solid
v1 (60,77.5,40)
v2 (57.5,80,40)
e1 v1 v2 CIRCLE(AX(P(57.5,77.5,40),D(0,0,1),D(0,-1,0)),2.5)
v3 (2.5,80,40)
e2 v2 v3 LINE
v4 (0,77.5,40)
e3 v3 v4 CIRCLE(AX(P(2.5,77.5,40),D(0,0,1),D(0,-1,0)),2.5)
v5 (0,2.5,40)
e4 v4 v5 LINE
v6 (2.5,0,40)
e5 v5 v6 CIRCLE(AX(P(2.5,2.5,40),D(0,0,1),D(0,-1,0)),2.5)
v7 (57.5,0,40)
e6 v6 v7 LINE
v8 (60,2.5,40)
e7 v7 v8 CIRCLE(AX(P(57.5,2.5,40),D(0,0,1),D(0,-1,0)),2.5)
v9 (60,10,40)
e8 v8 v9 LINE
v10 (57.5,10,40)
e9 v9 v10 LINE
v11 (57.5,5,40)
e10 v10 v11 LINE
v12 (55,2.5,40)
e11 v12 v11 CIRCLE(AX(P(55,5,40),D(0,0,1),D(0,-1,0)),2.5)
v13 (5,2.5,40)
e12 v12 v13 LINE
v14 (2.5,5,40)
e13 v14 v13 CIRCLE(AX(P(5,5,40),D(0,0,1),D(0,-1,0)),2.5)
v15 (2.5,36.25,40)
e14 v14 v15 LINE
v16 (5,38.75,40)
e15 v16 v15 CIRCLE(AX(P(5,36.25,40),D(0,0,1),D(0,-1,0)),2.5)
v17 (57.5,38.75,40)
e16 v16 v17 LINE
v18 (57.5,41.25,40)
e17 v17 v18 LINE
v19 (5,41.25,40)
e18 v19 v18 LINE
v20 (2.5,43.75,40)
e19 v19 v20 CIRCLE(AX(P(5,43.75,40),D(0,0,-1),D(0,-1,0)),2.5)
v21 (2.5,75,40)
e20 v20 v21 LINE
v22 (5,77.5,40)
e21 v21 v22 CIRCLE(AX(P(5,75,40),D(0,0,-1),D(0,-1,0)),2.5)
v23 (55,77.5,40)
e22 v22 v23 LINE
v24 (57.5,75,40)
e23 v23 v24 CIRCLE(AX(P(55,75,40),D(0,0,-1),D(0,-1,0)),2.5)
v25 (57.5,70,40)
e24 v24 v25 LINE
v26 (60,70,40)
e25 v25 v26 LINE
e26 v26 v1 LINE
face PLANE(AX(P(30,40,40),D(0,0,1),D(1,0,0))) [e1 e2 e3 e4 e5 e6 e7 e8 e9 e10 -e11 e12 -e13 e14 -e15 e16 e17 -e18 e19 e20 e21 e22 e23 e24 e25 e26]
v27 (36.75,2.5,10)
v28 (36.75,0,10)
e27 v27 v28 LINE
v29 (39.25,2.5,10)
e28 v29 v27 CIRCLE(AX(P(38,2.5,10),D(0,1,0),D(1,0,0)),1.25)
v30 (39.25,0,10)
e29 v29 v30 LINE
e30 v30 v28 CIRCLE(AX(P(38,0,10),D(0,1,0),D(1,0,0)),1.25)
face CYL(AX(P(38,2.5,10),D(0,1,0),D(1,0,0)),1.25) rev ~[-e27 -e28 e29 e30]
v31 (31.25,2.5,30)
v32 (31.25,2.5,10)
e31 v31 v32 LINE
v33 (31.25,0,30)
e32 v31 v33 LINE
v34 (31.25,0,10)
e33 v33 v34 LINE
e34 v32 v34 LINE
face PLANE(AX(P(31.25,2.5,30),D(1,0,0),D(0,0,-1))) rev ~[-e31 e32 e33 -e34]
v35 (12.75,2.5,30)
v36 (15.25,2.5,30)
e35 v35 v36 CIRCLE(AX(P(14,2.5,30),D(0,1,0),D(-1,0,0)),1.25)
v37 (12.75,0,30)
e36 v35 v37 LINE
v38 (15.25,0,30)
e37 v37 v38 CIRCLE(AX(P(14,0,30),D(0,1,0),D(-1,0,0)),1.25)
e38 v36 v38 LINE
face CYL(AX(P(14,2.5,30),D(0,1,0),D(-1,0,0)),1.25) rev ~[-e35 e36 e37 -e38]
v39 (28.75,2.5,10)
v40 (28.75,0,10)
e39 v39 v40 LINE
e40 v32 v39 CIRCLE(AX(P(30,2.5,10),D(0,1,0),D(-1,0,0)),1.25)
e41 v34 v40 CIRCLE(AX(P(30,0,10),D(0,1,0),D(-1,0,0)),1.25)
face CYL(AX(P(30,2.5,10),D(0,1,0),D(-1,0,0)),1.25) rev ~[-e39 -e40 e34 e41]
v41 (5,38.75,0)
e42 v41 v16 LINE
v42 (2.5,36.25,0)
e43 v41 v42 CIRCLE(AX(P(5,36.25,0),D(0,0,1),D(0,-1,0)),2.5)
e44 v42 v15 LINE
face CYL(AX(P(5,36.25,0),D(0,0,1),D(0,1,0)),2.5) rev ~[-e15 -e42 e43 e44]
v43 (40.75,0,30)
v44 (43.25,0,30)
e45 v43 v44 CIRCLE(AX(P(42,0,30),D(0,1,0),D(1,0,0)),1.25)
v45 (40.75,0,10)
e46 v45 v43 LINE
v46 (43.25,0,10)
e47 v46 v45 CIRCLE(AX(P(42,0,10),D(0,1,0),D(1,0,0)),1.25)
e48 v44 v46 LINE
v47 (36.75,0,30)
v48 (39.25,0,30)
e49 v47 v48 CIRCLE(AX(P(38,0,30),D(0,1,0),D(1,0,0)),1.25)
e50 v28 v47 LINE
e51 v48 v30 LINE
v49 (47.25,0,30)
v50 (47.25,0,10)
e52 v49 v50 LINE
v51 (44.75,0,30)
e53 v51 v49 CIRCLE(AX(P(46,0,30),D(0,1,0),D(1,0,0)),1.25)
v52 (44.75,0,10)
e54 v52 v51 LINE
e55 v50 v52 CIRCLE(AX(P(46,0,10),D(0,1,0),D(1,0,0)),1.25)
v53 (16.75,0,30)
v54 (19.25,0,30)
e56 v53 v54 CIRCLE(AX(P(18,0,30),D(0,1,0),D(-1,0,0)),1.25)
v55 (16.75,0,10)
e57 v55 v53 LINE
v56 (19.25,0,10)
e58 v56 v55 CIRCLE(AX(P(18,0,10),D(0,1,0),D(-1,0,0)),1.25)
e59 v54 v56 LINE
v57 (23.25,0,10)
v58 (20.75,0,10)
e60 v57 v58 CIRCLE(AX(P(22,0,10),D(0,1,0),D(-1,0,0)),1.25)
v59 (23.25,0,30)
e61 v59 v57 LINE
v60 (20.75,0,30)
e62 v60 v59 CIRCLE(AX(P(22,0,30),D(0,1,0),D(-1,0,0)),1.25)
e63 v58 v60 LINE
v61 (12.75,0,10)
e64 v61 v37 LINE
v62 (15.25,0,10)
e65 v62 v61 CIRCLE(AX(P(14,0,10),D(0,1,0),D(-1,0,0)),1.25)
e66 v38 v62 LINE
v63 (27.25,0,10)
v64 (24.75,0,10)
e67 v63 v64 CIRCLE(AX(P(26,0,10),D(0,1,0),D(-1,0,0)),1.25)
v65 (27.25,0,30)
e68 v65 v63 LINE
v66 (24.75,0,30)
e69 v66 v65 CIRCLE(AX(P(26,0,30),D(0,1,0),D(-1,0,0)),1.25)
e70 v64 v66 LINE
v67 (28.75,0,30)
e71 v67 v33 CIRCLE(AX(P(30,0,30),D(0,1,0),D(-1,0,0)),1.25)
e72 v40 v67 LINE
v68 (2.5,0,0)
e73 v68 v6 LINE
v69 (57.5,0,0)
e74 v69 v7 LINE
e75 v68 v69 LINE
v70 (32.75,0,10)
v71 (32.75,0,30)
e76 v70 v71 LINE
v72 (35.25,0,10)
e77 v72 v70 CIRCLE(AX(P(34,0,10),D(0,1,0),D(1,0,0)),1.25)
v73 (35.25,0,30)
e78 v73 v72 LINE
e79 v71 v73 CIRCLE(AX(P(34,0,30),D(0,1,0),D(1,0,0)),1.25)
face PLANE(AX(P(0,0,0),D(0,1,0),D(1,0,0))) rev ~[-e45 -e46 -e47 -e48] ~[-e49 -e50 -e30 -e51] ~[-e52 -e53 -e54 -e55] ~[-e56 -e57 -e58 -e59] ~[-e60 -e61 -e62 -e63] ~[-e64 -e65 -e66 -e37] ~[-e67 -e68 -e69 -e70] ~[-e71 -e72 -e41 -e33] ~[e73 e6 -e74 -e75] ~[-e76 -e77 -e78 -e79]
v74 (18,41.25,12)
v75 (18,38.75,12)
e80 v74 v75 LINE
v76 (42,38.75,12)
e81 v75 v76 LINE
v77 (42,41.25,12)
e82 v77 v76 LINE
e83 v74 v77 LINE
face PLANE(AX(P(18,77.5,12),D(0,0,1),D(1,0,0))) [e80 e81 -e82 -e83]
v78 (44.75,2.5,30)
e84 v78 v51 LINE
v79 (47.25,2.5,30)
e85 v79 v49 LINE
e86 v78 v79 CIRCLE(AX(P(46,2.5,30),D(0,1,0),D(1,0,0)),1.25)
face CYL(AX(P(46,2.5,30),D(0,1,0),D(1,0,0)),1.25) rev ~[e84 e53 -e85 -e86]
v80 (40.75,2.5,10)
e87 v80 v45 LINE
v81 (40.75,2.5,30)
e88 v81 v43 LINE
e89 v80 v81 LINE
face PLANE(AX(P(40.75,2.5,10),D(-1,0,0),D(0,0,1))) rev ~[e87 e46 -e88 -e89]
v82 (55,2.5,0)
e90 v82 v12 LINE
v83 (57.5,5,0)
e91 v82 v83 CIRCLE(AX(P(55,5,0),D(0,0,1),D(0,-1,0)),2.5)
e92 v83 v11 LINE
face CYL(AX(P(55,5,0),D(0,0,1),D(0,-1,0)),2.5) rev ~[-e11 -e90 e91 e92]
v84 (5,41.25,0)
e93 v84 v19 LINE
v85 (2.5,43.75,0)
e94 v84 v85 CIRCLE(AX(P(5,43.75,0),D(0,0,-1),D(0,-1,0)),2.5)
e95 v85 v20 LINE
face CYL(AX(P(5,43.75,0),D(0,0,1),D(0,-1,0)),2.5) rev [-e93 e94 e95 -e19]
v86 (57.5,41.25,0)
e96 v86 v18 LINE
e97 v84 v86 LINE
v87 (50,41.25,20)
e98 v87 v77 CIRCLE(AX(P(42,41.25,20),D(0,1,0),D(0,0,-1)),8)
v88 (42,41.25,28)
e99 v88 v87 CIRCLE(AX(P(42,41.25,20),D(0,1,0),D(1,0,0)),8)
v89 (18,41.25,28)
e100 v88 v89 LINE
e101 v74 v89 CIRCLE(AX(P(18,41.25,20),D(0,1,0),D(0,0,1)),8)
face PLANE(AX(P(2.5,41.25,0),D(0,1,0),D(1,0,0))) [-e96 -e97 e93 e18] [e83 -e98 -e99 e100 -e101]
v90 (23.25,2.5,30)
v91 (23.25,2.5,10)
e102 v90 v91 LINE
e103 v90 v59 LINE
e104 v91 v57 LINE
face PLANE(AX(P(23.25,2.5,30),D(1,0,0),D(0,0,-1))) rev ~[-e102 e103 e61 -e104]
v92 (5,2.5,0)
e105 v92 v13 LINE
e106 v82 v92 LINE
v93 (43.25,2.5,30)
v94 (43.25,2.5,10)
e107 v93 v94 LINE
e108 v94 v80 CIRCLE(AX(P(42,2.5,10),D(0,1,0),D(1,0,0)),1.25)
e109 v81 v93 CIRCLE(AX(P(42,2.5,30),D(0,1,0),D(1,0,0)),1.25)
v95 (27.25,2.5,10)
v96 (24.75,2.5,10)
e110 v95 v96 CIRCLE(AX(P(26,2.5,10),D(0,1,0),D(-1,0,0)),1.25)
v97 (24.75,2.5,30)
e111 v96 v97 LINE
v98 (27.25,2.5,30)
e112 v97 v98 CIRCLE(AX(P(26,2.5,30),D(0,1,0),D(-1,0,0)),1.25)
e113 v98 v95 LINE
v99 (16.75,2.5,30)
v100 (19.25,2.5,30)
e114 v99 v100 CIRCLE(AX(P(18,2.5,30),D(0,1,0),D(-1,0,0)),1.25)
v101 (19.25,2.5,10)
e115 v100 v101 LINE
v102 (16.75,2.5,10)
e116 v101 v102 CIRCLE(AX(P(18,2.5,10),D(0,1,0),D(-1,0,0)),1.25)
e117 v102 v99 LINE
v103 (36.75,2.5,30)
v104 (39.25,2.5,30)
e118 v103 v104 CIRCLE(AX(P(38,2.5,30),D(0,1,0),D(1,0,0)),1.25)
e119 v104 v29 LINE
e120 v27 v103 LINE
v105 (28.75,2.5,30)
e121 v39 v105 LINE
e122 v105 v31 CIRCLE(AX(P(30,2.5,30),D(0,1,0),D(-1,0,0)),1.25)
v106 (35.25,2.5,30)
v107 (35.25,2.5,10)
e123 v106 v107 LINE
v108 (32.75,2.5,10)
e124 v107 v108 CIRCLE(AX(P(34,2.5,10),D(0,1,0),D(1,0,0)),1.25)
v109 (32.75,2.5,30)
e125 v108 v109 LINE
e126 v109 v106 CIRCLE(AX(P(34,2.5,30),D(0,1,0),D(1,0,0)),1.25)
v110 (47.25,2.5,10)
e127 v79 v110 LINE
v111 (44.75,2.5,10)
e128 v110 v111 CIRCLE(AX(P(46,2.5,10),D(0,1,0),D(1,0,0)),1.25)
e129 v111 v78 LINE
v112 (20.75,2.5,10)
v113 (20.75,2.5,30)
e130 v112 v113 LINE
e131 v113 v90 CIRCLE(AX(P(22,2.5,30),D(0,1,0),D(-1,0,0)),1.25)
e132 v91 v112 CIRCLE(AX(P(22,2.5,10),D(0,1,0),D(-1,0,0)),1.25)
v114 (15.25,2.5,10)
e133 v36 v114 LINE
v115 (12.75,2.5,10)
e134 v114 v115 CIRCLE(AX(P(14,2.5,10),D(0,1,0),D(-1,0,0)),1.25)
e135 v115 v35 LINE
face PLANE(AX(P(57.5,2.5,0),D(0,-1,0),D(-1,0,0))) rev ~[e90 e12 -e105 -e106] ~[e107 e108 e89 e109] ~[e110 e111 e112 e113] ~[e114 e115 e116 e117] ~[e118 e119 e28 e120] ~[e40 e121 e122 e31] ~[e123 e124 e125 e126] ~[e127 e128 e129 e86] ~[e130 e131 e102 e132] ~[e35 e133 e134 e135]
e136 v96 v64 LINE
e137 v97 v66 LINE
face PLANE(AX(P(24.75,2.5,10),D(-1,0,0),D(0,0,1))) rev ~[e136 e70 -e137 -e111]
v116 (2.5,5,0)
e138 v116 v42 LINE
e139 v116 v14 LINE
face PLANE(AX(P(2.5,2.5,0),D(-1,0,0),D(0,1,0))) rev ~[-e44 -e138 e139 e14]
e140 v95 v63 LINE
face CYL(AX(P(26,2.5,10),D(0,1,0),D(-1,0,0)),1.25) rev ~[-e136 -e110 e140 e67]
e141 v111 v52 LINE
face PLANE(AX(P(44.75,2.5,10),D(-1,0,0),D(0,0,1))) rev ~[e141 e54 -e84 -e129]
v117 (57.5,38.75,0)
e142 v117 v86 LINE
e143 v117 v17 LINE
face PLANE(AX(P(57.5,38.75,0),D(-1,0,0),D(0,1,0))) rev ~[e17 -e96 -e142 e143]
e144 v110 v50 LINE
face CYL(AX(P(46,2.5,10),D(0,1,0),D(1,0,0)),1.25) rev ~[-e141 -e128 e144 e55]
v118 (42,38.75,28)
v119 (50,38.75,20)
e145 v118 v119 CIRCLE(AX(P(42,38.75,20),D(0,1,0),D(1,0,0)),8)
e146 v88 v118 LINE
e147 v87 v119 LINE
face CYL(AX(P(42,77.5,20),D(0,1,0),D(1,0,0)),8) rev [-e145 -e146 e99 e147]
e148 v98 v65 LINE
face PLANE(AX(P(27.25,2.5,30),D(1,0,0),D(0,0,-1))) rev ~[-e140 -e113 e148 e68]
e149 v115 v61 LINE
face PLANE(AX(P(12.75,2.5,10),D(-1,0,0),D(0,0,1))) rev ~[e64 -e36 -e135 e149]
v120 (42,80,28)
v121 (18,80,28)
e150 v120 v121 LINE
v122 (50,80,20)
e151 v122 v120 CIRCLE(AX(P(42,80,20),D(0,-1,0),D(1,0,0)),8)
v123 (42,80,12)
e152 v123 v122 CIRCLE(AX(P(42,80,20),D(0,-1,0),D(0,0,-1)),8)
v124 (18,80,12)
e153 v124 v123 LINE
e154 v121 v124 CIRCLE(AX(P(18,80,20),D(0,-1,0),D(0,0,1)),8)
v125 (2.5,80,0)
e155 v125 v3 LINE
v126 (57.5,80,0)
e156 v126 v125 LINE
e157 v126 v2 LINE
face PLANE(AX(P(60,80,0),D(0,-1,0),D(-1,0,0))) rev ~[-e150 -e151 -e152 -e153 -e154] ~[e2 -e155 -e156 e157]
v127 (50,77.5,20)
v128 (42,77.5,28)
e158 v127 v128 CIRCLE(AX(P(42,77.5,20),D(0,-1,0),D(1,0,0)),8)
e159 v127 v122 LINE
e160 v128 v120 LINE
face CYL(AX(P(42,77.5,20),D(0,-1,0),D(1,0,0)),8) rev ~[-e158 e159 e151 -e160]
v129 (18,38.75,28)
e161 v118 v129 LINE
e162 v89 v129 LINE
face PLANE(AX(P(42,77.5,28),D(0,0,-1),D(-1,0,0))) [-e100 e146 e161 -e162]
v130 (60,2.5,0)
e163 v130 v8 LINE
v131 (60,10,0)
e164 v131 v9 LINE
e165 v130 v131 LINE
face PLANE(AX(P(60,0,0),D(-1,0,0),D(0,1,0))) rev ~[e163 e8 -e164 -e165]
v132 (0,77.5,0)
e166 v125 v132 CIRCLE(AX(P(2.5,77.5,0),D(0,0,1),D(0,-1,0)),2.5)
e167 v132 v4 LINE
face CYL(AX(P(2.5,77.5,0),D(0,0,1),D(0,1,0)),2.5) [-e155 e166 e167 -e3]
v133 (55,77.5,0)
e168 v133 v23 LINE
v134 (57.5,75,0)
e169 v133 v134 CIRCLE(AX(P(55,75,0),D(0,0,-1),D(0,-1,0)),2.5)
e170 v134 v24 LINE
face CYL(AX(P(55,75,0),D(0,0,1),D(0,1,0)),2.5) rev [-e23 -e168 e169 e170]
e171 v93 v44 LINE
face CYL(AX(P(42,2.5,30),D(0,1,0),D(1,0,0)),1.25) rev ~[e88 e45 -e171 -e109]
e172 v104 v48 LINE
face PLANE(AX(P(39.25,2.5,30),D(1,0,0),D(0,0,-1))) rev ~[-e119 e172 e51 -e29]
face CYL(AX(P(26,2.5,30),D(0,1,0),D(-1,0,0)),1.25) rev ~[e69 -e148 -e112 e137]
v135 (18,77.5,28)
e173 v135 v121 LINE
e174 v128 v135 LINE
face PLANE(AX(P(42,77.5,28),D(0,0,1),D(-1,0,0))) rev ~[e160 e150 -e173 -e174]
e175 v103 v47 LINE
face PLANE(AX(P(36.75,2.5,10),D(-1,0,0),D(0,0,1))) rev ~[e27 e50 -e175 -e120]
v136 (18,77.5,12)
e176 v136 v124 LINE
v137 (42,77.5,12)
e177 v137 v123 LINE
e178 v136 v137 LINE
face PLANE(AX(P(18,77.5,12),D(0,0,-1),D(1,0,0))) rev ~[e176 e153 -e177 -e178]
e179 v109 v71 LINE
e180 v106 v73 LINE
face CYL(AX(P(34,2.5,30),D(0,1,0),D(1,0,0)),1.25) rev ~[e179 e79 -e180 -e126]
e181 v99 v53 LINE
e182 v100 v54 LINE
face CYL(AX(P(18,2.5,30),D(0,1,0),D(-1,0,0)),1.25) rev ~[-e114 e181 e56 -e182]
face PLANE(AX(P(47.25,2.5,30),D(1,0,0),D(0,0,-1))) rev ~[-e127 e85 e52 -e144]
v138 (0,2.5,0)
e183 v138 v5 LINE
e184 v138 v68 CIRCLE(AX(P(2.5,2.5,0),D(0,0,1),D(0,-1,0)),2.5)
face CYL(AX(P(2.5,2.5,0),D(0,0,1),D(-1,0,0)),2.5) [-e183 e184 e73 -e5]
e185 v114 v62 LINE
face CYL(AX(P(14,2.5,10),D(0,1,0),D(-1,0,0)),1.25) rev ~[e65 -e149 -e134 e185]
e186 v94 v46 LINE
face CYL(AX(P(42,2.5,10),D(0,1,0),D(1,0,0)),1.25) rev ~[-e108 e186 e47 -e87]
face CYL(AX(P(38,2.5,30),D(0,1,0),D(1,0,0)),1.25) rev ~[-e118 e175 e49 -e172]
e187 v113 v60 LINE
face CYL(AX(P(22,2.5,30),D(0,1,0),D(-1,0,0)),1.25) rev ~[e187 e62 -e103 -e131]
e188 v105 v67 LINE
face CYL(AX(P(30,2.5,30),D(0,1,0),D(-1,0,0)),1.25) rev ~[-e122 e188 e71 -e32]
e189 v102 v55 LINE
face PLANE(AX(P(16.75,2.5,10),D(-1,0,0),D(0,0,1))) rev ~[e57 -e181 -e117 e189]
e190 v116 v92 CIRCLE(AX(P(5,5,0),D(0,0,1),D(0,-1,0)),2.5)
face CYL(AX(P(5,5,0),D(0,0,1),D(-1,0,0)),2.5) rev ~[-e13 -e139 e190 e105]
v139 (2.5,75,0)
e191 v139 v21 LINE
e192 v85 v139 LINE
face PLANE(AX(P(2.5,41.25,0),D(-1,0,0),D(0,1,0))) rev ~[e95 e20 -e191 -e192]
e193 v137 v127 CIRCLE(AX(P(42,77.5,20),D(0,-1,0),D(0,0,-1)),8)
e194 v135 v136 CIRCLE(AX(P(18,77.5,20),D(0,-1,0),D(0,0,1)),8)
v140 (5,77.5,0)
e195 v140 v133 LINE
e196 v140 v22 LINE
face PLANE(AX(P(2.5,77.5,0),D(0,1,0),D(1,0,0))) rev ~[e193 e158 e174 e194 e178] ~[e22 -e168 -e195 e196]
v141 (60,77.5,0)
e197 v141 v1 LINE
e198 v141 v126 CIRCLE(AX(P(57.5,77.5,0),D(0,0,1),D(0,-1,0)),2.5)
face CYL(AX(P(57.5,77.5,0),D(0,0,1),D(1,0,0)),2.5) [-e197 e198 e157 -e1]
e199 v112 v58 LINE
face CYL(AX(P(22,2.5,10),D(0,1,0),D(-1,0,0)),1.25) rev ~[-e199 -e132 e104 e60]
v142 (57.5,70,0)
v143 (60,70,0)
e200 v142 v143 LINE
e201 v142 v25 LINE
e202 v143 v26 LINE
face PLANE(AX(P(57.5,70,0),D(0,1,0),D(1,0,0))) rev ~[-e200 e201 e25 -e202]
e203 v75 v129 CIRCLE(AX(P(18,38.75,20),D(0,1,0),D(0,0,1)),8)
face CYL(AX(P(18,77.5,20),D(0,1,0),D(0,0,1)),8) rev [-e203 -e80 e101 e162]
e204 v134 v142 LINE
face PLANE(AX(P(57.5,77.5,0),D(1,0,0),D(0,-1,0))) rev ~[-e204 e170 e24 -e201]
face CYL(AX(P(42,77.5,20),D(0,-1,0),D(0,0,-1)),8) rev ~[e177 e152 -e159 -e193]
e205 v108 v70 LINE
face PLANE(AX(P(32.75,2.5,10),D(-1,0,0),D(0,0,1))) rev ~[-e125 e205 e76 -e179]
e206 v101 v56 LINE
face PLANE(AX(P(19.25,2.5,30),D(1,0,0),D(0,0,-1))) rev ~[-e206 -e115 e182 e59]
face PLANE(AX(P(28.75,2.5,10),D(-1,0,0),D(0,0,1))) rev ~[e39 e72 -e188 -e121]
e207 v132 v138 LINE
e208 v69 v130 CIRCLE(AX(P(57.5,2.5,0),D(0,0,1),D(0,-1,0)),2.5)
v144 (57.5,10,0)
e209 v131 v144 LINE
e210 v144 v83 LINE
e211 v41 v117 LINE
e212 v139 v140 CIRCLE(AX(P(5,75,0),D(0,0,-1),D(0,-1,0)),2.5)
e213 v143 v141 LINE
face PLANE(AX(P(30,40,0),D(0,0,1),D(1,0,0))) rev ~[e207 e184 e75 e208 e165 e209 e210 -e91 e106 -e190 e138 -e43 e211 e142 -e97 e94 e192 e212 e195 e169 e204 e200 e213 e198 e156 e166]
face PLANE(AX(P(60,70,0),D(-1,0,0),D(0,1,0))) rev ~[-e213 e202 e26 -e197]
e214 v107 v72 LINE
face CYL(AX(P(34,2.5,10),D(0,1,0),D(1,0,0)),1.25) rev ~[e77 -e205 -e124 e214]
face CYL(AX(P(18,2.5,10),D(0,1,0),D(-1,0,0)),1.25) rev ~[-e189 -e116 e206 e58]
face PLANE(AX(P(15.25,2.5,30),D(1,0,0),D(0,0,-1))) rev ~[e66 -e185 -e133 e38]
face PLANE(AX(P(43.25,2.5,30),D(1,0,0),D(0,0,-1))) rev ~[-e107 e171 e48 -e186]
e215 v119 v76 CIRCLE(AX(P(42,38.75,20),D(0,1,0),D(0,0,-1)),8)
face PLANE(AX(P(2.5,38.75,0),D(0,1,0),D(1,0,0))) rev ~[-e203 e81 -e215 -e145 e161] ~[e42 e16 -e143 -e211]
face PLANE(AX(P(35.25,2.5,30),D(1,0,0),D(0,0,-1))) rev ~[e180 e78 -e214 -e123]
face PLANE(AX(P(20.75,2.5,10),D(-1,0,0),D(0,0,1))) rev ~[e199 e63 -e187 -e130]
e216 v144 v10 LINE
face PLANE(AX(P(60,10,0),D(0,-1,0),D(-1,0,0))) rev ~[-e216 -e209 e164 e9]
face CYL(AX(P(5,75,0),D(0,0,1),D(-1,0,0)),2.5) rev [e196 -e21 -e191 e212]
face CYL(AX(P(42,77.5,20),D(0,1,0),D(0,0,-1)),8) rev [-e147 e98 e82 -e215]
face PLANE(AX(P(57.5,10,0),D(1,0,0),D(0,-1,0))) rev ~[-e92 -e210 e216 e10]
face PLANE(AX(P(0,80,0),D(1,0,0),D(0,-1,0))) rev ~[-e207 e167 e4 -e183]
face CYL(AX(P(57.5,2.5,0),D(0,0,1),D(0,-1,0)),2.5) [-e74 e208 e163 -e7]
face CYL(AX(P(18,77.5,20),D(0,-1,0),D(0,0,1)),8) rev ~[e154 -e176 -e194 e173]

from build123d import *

# Parameters (mm, degrees)
F2_W          = 55
F2_H          = 2.5
F4_DEPTH      = 40
F6_DEPTH      = 2.501
F6_DEPTH_BACK = 75
F8_DEPTH      = 2.501
F9_R          = 2.5


with BuildPart() as f4:
    # F2 (on Top) → F4 (new body)
    with BuildSketch(Plane.XY):
        with Locations((30, 40)):
            Rectangle(F2_W, F2_H)
        Polygon((0, 80), (0, 0), (60, 0), (60, 10), (57.5, 10), (57.5, 2.5), (2.5, 2.5), (2.5, 38.75), (2.5, 41.25), (2.5, 77.5), (57.5, 77.5), (57.5, 70), (60, 70), (60, 80), align=None)
    extrude(amount=F4_DEPTH)

    # F5 (on face) → F6 (cut, two sides)
    with BuildSketch(Plane.XZ.offset(-77.5)) as f6_sk:
        with BuildLine():
            ThreePointArc((18, 12), (23.6568542495, 14.3431457505), (26, 20))
            ThreePointArc((26, 20), (23.6568542495, 25.6568542495), (18, 28))
            ThreePointArc((18, 28), (10, 20), (18, 12))
        make_face()
        with BuildLine():
            ThreePointArc((18, 28), (23.6568542495, 25.6568542495), (26, 20))
            ThreePointArc((26, 20), (23.6568542495, 14.3431457505), (18, 12))
            Line((18, 12), (42, 12))
            ThreePointArc((42, 12), (34, 20), (42, 28))
            Line((42, 28), (18, 28))
        make_face()
        with BuildLine():
            ThreePointArc((50, 20), (47.6568542495, 25.6568542495), (42, 28))
            ThreePointArc((42, 28), (34, 20), (42, 12))
            ThreePointArc((42, 12), (47.6568542495, 14.3431457505), (50, 20))
        make_face()
    extrude(amount=-F6_DEPTH, mode=Mode.SUBTRACT)
    extrude(f6_sk.sketch, amount=F6_DEPTH_BACK, mode=Mode.SUBTRACT)

    # F7 (on face) → F8 (cut, through all)
    with BuildSketch(Plane(origin=(0, 2.5, 0), x_dir=(-1, 0, 0), z_dir=(0, 1, 0))):
        with BuildLine():
            ThreePointArc((-15.25, 30), (-14, 28.75), (-12.75, 30))
            ThreePointArc((-12.75, 30), (-14, 31.25), (-15.25, 30))
        make_face()
        with BuildLine():
            ThreePointArc((-15.25, 10), (-14, 11.25), (-12.75, 10))
            Line((-12.75, 10), (-12.75, 30))
            ThreePointArc((-12.75, 30), (-14, 28.75), (-15.25, 30))
            Line((-15.25, 30), (-15.25, 10))
        make_face()
        with BuildLine():
            ThreePointArc((-15.25, 10), (-14, 8.75), (-12.75, 10))
            ThreePointArc((-12.75, 10), (-14, 11.25), (-15.25, 10))
        make_face()
        with BuildLine():
            ThreePointArc((-19.25, 10), (-18, 8.75), (-16.75, 10))
            ThreePointArc((-16.75, 10), (-18, 11.25), (-19.25, 10))
        make_face()
        with BuildLine():
            ThreePointArc((-19.25, 10), (-18, 11.25), (-16.75, 10))
            Line((-16.75, 10), (-16.75, 30))
            ThreePointArc((-16.75, 30), (-18, 28.75), (-19.25, 30))
            Line((-19.25, 30), (-19.25, 10))
        make_face()
        with BuildLine():
            ThreePointArc((-19.25, 30), (-18, 28.75), (-16.75, 30))
            ThreePointArc((-16.75, 30), (-18, 31.25), (-19.25, 30))
        make_face()
        with BuildLine():
            ThreePointArc((-23.25, 30), (-22, 28.75), (-20.75, 30))
            ThreePointArc((-20.75, 30), (-22, 31.25), (-23.25, 30))
        make_face()
        with BuildLine():
            ThreePointArc((-23.25, 10), (-22, 11.25), (-20.75, 10))
            Line((-20.75, 10), (-20.75, 30))
            ThreePointArc((-20.75, 30), (-22, 28.75), (-23.25, 30))
            Line((-23.25, 30), (-23.25, 10))
        make_face()
        with BuildLine():
            ThreePointArc((-23.25, 10), (-22, 8.75), (-20.75, 10))
            ThreePointArc((-20.75, 10), (-22, 11.25), (-23.25, 10))
        make_face()
        with BuildLine():
            ThreePointArc((-27.25, 10), (-26, 8.75), (-24.75, 10))
            ThreePointArc((-24.75, 10), (-26, 11.25), (-27.25, 10))
        make_face()
        with BuildLine():
            ThreePointArc((-27.25, 30), (-26, 28.75), (-24.75, 30))
            ThreePointArc((-24.75, 30), (-26, 31.25), (-27.25, 30))
        make_face()
        with BuildLine():
            ThreePointArc((-31.25, 30), (-30, 28.75), (-28.75, 30))
            ThreePointArc((-28.75, 30), (-30, 31.25), (-31.25, 30))
        make_face()
        with BuildLine():
            Line((-28.75, 10), (-28.75, 30))
            ThreePointArc((-28.75, 30), (-30, 28.75), (-31.25, 30))
            Line((-31.25, 30), (-31.25, 10))
            ThreePointArc((-31.25, 10), (-30, 11.25), (-28.75, 10))
        make_face()
        with BuildLine():
            ThreePointArc((-31.25, 10), (-30, 8.75), (-28.75, 10))
            ThreePointArc((-28.75, 10), (-30, 11.25), (-31.25, 10))
        make_face()
        with BuildLine():
            ThreePointArc((-27.25, 10), (-26, 11.25), (-24.75, 10))
            Line((-24.75, 10), (-24.75, 30))
            ThreePointArc((-24.75, 30), (-26, 28.75), (-27.25, 30))
            Line((-27.25, 30), (-27.25, 10))
        make_face()
        with BuildLine():
            ThreePointArc((-32.75, 10), (-34, 11.25), (-35.25, 10))
            ThreePointArc((-35.25, 10), (-34, 8.75), (-32.75, 10))
        make_face()
        with BuildLine():
            ThreePointArc((-32.75, 30), (-34, 28.75), (-35.25, 30))
            Line((-35.25, 30), (-35.25, 10))
            ThreePointArc((-35.25, 10), (-34, 11.25), (-32.75, 10))
            Line((-32.75, 10), (-32.75, 30))
        make_face()
        with BuildLine():
            ThreePointArc((-32.75, 30), (-34, 31.25), (-35.25, 30))
            ThreePointArc((-35.25, 30), (-34, 28.75), (-32.75, 30))
        make_face()
        with BuildLine():
            ThreePointArc((-36.75, 30), (-38, 31.25), (-39.25, 30))
            ThreePointArc((-39.25, 30), (-38, 28.75), (-36.75, 30))
        make_face()
        with BuildLine():
            ThreePointArc((-36.75, 30), (-38, 28.75), (-39.25, 30))
            Line((-39.25, 30), (-39.25, 10))
            ThreePointArc((-39.25, 10), (-38, 11.25), (-36.75, 10))
            Line((-36.75, 10), (-36.75, 30))
        make_face()
        with BuildLine():
            ThreePointArc((-36.75, 10), (-38, 11.25), (-39.25, 10))
            ThreePointArc((-39.25, 10), (-38, 8.75), (-36.75, 10))
        make_face()
        with BuildLine():
            ThreePointArc((-40.75, 10), (-42, 11.25), (-43.25, 10))
            ThreePointArc((-43.25, 10), (-42, 8.75), (-40.75, 10))
        make_face()
        with BuildLine():
            ThreePointArc((-40.75, 30), (-42, 28.75), (-43.25, 30))
            Line((-43.25, 30), (-43.25, 10))
            ThreePointArc((-43.25, 10), (-42, 11.25), (-40.75, 10))
            Line((-40.75, 10), (-40.75, 30))
        make_face()
        with BuildLine():
            ThreePointArc((-40.75, 30), (-42, 31.25), (-43.25, 30))
            ThreePointArc((-43.25, 30), (-42, 28.75), (-40.75, 30))
        make_face()
        with BuildLine():
            ThreePointArc((-44.75, 30), (-46, 31.25), (-47.25, 30))
            ThreePointArc((-47.25, 30), (-46, 28.75), (-44.75, 30))
        make_face()
        with BuildLine():
            ThreePointArc((-44.75, 30), (-46, 28.75), (-47.25, 30))
            Line((-47.25, 30), (-47.25, 10))
            ThreePointArc((-47.25, 10), (-46, 11.25), (-44.75, 10))
            Line((-44.75, 10), (-44.75, 30))
        make_face()
        with BuildLine():
            ThreePointArc((-44.75, 10), (-46, 11.25), (-47.25, 10))
            ThreePointArc((-47.25, 10), (-46, 8.75), (-44.75, 10))
        make_face()
    extrude(amount=-F8_DEPTH, mode=Mode.SUBTRACT)

    # F9
    f9_edges = [f4.edges().sort_by_distance(p)[0] for p in [
        (2.5, 41.25, 20),
        (2.5, 38.75, 20),
        (2.5, 77.5, 20),
        (60, 80, 20),
        (57.5, 77.5, 20),
        (0, 80, 20),
        (2.5, 2.5, 20),
        (57.5, 2.5, 20),
        (0, 0, 20),
        (60, 0, 20),
    ]]
    fillet(f9_edges, radius=F9_R)


solid = f4.part
